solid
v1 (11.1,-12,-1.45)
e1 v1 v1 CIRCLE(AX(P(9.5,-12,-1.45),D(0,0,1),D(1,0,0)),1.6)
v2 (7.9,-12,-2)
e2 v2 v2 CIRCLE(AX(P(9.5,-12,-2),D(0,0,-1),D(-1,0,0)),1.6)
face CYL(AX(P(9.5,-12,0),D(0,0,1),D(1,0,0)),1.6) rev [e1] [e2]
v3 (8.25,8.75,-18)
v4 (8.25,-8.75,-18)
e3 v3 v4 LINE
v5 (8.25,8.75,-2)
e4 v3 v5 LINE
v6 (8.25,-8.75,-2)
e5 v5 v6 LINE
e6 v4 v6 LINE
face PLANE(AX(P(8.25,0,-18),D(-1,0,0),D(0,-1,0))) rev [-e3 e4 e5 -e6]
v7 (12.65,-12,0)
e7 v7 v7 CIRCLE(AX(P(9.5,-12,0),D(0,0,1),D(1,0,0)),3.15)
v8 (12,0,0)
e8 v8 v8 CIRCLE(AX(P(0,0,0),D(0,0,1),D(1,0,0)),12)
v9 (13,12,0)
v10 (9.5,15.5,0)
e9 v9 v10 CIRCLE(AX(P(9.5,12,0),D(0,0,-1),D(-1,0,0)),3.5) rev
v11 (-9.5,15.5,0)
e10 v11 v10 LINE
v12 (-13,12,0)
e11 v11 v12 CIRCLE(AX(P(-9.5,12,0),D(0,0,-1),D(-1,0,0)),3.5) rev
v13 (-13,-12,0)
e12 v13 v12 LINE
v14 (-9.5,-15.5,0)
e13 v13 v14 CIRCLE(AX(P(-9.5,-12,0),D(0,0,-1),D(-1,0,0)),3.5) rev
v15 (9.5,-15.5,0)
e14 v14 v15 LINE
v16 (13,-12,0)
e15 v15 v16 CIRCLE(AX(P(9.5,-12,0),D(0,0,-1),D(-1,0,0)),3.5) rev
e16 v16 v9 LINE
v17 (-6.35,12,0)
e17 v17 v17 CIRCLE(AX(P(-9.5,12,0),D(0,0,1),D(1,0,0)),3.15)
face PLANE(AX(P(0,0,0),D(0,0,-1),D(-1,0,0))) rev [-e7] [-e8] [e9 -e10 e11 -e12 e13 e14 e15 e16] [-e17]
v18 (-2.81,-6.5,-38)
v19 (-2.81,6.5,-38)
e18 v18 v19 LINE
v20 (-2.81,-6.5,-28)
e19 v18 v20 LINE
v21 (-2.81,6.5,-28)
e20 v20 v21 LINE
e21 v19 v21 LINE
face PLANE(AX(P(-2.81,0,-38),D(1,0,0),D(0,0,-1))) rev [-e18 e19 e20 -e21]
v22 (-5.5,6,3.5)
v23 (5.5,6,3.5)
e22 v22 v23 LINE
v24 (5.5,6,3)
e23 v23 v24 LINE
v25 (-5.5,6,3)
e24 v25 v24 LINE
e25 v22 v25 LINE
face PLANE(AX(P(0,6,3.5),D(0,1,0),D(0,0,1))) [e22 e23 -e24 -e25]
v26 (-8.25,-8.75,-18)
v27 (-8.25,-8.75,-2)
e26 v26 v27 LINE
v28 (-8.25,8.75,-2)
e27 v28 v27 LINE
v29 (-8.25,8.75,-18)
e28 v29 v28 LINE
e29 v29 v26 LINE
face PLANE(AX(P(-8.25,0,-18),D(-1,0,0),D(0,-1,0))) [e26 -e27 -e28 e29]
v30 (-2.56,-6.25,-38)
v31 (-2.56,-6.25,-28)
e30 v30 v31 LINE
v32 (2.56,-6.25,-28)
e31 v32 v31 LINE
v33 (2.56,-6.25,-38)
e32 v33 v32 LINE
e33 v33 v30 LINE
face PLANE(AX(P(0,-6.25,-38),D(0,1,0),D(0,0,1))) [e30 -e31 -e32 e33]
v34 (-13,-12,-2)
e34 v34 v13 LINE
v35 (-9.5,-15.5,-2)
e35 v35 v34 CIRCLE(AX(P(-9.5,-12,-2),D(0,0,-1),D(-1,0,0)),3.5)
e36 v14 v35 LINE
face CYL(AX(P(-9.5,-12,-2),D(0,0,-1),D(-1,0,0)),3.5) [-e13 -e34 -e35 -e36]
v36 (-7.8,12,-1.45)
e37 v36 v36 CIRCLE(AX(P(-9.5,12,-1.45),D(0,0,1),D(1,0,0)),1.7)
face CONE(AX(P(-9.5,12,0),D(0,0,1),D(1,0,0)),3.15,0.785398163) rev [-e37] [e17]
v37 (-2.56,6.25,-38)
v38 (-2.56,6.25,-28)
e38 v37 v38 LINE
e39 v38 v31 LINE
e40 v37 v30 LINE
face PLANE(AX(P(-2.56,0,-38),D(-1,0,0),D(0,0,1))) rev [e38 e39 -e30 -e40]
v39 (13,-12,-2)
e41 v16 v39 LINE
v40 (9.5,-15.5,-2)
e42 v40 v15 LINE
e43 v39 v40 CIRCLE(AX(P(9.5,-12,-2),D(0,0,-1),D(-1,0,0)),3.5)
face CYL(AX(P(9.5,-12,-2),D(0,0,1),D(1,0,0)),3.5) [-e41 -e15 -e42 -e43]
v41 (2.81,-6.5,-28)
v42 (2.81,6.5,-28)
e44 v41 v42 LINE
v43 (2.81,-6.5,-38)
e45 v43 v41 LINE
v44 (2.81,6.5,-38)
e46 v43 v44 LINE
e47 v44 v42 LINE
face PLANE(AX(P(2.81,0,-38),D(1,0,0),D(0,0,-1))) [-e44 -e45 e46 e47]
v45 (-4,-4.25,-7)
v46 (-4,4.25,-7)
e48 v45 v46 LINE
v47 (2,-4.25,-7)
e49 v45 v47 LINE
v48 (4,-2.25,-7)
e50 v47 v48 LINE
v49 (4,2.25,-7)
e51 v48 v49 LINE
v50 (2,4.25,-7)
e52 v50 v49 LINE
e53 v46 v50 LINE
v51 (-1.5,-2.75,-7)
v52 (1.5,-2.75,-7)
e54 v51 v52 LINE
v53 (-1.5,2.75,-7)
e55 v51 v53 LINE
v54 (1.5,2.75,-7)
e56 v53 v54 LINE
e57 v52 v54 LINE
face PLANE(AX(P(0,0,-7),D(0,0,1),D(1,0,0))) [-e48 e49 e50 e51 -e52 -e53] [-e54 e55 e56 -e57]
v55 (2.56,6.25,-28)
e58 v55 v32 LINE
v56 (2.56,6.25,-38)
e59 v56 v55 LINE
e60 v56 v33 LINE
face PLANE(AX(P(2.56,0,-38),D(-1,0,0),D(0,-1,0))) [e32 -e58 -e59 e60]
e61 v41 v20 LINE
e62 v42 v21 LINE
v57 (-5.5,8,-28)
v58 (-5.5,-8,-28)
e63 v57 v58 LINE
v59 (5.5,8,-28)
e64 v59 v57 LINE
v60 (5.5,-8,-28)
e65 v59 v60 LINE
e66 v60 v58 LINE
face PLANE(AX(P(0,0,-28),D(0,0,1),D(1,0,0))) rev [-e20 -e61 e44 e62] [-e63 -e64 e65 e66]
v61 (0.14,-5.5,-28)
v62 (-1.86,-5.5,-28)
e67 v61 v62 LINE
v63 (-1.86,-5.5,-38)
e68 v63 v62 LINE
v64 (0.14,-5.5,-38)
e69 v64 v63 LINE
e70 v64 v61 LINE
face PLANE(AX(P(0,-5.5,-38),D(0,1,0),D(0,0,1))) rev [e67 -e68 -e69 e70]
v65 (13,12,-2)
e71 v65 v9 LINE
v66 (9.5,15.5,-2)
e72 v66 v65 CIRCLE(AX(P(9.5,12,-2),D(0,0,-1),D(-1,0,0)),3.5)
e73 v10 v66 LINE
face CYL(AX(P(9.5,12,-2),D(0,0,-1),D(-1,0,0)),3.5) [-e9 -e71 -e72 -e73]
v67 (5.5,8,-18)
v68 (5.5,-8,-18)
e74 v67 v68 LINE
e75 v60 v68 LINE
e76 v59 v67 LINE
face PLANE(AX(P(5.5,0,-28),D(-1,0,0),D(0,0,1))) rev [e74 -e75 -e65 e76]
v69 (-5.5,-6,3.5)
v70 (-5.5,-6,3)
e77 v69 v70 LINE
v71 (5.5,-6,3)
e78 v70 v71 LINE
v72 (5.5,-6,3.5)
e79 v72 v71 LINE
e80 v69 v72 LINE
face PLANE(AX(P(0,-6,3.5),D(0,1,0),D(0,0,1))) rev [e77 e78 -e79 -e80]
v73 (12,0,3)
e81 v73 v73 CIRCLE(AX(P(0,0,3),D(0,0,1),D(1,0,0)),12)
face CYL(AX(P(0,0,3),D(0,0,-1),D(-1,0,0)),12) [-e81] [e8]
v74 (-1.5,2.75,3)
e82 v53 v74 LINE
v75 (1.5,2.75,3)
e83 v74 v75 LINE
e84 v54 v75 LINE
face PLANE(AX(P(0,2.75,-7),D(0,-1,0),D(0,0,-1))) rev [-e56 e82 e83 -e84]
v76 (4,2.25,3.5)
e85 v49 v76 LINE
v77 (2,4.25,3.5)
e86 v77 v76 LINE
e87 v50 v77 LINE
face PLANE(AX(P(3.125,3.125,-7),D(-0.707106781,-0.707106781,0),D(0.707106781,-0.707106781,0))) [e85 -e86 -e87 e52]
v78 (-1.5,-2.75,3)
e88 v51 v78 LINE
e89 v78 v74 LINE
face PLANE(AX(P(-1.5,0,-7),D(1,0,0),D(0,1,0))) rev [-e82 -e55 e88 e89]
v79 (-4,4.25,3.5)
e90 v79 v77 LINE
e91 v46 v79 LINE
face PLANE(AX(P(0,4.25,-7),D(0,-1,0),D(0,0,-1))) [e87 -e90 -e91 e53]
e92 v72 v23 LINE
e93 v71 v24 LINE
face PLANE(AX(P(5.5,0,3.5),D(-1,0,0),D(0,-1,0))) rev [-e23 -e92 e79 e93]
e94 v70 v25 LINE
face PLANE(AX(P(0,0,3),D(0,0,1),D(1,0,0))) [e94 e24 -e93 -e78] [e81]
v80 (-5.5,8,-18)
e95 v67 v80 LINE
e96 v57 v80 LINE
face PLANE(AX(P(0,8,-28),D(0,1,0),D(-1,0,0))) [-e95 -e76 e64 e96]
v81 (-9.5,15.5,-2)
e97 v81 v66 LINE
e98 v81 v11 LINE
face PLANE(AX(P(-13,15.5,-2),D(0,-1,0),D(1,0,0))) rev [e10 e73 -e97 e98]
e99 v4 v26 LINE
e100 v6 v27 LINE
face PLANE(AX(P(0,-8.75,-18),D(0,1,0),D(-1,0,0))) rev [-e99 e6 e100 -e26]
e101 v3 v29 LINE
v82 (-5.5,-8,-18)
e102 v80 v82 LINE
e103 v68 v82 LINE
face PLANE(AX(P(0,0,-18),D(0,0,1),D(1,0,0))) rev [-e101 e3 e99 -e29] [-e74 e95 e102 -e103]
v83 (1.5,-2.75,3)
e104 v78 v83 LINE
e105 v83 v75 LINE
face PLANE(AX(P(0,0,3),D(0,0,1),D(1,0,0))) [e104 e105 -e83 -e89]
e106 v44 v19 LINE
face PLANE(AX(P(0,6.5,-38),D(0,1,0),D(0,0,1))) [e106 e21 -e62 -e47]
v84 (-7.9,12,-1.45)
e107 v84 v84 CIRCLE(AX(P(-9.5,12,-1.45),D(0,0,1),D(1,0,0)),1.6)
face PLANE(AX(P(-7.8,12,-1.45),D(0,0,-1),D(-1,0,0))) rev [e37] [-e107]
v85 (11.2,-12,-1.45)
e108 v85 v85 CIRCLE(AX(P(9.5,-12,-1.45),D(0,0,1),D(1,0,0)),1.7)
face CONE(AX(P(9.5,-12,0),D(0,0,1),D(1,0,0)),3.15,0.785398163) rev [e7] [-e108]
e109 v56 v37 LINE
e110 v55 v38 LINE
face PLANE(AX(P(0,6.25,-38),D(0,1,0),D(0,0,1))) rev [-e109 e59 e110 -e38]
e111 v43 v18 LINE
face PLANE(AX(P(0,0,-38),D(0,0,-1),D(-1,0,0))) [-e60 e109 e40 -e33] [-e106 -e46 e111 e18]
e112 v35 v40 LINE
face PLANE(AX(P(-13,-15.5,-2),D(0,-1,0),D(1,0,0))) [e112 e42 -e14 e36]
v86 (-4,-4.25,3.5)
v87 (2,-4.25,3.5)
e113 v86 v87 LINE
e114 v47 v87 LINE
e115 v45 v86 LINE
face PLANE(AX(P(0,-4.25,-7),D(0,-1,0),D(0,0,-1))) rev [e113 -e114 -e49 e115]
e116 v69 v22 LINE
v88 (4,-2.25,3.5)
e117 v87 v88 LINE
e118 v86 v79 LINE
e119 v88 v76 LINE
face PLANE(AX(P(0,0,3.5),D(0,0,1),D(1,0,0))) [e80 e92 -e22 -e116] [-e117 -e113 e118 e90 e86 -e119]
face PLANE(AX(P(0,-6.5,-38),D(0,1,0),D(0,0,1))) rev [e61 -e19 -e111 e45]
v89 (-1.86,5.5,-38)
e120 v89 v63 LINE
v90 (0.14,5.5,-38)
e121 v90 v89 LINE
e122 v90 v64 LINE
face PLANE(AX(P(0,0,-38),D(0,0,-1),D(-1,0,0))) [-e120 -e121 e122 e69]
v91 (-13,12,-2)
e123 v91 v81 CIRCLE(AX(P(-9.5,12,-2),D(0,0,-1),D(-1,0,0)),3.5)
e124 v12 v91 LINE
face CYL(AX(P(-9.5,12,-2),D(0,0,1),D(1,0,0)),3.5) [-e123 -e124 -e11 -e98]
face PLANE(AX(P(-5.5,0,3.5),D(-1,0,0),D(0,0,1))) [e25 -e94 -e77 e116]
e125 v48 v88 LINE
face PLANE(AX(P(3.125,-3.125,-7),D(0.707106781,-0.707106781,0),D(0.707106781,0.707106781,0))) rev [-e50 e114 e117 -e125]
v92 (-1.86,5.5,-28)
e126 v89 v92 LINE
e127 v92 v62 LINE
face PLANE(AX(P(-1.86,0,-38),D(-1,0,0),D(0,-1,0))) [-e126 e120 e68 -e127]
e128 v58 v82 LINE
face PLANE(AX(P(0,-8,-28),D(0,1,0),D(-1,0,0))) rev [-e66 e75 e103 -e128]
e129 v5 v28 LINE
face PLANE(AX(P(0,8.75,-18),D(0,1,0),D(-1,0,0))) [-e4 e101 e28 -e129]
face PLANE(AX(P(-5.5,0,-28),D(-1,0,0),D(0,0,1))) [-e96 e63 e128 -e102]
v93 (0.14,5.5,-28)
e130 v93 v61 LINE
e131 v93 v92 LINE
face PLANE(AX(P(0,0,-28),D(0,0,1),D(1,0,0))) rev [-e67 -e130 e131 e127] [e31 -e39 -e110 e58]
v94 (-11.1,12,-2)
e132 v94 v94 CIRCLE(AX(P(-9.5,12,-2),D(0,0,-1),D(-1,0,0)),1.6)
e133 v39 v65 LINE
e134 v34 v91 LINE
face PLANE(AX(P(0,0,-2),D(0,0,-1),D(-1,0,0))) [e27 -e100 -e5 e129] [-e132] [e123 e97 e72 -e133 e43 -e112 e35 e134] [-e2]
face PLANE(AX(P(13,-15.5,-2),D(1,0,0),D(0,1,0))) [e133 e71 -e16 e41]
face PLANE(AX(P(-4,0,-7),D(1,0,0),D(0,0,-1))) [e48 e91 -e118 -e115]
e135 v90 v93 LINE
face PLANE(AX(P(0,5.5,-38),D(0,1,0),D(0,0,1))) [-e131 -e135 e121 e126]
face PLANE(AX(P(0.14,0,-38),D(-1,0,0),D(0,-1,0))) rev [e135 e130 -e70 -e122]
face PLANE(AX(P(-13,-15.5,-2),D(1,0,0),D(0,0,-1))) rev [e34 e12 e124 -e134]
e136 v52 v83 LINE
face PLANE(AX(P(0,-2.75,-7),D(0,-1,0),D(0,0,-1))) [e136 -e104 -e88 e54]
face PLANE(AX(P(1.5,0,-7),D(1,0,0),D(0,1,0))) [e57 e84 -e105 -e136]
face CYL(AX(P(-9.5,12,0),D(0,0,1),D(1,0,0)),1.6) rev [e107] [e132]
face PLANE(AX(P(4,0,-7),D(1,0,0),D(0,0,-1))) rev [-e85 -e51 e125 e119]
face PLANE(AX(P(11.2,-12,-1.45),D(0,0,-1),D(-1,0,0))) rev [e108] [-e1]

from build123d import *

# Parameters (mm, degrees)
SZKIC2_R                    = 12
DODANIE_WYCI_GNI_CIE1_DEPTH = 3
SZKIC2_3_W                  = 26
SZKIC2_3_H                  = 31
DODANIE_WYCI_GNI_CIE2_DEPTH = 2
DODANIE_WYCI_GNI_CIE3_START = -2
SZKIC2_4_W                  = 16.5
SZKIC2_4_H                  = 17.5
DODANIE_WYCI_GNI_CIE3_DEPTH = 16
DODANIE_WYCI_GNI_CIE4_START = -2
SZKIC2_5_W                  = 11
SZKIC2_5_H                  = 16
DODANIE_WYCI_GNI_CIE4_DEPTH = 26
ZAOKR_GLENIE1_R             = 3.5
SZKIC6_W                    = 5.62
SZKIC6_H                    = 13
SZKIC6_W_2                  = 5.12
SZKIC6_H_2                  = 12.5
SZKIC6_W_3                  = 2
SZKIC6_H_3                  = 11
DODANIE_WYCI_GNI_CIE5_DEPTH = 10
SZKIC7_W                    = 3
SZKIC7_H                    = 5.5
WYTNIJ_WYCI_GNI_CIE1_DEPTH  = 10
SZKIC7_3_W                  = 11
SZKIC7_3_H                  = 12
DODANIE_WYCI_GNI_CIE6_DEPTH = 0.5


# Read off the part's stored shape, not the designer's step: ZaawansowanyOtwór1
with BuildPart() as part:
    # Szkic2 → Dodanie-wyciągnięcie1 (new body)
    with BuildSketch(Plane.XY):
        Circle(SZKIC2_R)
    extrude(amount=DODANIE_WYCI_GNI_CIE1_DEPTH)

    # Szkic2<3> → Dodanie-wyciągnięcie2 (add)
    with BuildSketch(Plane.XY):
        Rectangle(SZKIC2_3_W, SZKIC2_3_H)
    extrude(amount=-DODANIE_WYCI_GNI_CIE2_DEPTH)

    # Szkic2<4> → Dodanie-wyciągnięcie3 (add)
    with BuildSketch(Plane.XY.offset(DODANIE_WYCI_GNI_CIE3_START)):
        Rectangle(SZKIC2_4_W, SZKIC2_4_H)
    extrude(amount=-DODANIE_WYCI_GNI_CIE3_DEPTH)

    # Szkic2<5> → Dodanie-wyciągnięcie4 (add)
    with BuildSketch(Plane.XY.offset(DODANIE_WYCI_GNI_CIE4_START)):
        Rectangle(SZKIC2_5_W, SZKIC2_5_H)
    extrude(amount=-DODANIE_WYCI_GNI_CIE4_DEPTH)

    # Zaokrąglenie1
    zaokr_glenie1_edges = [part.edges().sort_by_distance(p)[0] for p in [
        (-13, -15.5, -1),
        (-13, 15.5, -1),
        (13, 15.5, -1),
        (13, -15.5, -1),
    ]]
    fillet(zaokr_glenie1_edges, radius=ZAOKR_GLENIE1_R)

    # ZaawansowanyOtwór1 outline → ZaawansowanyOtwór1 (revolve, cut)
    with BuildSketch(Plane(origin=(9.5, -12, 0), x_dir=(1, 0, 0), z_dir=(0, -1, 0))):
        Polygon((1.6, -1.45), (1.7, -1.45), (3.15, 0), (0, 0), (0, -2), (1.6, -2), align=None)
    revolve(axis=Axis((9.5, -12, 0), (0, 0, 1)), mode=Mode.SUBTRACT)

    # ZaawansowanyOtw_r1 2 outline → ZaawansowanyOtw_r1 2 (revolve, cut)
    with BuildSketch(Plane(origin=(-9.5, 12, 0), x_dir=(1, 0, 0), z_dir=(0, -1, 0))):
        Polygon((3.15, 0), (0, 0), (0, -2), (1.6, -2), (1.6, -1.45), (1.7, -1.45), align=None)
    revolve(axis=Axis((-9.5, 12, 0), (0, 0, 1)), mode=Mode.SUBTRACT)

    # Szkic6 → Dodanie-wyciągnięcie5 (add)
    # profile 1 of 2: a face of its own
    with BuildSketch(Plane(origin=(0, 0, -28), x_dir=(-1, 0, 0), z_dir=(0, 0, -1))):
        Rectangle(SZKIC6_W, SZKIC6_H)
        Rectangle(SZKIC6_W_2, SZKIC6_H_2, mode=Mode.SUBTRACT)
    # profile 2 of 2: a face of its own
    with BuildSketch(Plane(origin=(0, 0, -28), x_dir=(-1, 0, 0), z_dir=(0, 0, -1))):
        with Locations((0.86, 0)):
            Rectangle(SZKIC6_W_3, SZKIC6_H_3)
    extrude(amount=DODANIE_WYCI_GNI_CIE5_DEPTH)

    # Szkic7 → Wytnij-wyciągnięcie1 (cut)
    with BuildSketch(Plane.XY.offset(3)):
        Polygon((-4, -4.25), (2, -4.25), (4, -2.25), (4, 2.25), (2, 4.25), (-4, 4.25), align=None)
        Rectangle(SZKIC7_W, SZKIC7_H, mode=Mode.SUBTRACT)
    extrude(amount=-WYTNIJ_WYCI_GNI_CIE1_DEPTH, mode=Mode.SUBTRACT)

    # Szkic7<3> → Dodanie-wyciągnięcie6 (add)
    with BuildSketch(Plane.XY.offset(3)):
        Rectangle(SZKIC7_3_W, SZKIC7_3_H)
        Polygon((2, -4.25), (4, -2.25), (4, 2.25), (2, 4.25), (-4, 4.25), (-4, -4.25), align=None, mode=Mode.SUBTRACT)
    extrude(amount=DODANIE_WYCI_GNI_CIE6_DEPTH)


solid = part.part
